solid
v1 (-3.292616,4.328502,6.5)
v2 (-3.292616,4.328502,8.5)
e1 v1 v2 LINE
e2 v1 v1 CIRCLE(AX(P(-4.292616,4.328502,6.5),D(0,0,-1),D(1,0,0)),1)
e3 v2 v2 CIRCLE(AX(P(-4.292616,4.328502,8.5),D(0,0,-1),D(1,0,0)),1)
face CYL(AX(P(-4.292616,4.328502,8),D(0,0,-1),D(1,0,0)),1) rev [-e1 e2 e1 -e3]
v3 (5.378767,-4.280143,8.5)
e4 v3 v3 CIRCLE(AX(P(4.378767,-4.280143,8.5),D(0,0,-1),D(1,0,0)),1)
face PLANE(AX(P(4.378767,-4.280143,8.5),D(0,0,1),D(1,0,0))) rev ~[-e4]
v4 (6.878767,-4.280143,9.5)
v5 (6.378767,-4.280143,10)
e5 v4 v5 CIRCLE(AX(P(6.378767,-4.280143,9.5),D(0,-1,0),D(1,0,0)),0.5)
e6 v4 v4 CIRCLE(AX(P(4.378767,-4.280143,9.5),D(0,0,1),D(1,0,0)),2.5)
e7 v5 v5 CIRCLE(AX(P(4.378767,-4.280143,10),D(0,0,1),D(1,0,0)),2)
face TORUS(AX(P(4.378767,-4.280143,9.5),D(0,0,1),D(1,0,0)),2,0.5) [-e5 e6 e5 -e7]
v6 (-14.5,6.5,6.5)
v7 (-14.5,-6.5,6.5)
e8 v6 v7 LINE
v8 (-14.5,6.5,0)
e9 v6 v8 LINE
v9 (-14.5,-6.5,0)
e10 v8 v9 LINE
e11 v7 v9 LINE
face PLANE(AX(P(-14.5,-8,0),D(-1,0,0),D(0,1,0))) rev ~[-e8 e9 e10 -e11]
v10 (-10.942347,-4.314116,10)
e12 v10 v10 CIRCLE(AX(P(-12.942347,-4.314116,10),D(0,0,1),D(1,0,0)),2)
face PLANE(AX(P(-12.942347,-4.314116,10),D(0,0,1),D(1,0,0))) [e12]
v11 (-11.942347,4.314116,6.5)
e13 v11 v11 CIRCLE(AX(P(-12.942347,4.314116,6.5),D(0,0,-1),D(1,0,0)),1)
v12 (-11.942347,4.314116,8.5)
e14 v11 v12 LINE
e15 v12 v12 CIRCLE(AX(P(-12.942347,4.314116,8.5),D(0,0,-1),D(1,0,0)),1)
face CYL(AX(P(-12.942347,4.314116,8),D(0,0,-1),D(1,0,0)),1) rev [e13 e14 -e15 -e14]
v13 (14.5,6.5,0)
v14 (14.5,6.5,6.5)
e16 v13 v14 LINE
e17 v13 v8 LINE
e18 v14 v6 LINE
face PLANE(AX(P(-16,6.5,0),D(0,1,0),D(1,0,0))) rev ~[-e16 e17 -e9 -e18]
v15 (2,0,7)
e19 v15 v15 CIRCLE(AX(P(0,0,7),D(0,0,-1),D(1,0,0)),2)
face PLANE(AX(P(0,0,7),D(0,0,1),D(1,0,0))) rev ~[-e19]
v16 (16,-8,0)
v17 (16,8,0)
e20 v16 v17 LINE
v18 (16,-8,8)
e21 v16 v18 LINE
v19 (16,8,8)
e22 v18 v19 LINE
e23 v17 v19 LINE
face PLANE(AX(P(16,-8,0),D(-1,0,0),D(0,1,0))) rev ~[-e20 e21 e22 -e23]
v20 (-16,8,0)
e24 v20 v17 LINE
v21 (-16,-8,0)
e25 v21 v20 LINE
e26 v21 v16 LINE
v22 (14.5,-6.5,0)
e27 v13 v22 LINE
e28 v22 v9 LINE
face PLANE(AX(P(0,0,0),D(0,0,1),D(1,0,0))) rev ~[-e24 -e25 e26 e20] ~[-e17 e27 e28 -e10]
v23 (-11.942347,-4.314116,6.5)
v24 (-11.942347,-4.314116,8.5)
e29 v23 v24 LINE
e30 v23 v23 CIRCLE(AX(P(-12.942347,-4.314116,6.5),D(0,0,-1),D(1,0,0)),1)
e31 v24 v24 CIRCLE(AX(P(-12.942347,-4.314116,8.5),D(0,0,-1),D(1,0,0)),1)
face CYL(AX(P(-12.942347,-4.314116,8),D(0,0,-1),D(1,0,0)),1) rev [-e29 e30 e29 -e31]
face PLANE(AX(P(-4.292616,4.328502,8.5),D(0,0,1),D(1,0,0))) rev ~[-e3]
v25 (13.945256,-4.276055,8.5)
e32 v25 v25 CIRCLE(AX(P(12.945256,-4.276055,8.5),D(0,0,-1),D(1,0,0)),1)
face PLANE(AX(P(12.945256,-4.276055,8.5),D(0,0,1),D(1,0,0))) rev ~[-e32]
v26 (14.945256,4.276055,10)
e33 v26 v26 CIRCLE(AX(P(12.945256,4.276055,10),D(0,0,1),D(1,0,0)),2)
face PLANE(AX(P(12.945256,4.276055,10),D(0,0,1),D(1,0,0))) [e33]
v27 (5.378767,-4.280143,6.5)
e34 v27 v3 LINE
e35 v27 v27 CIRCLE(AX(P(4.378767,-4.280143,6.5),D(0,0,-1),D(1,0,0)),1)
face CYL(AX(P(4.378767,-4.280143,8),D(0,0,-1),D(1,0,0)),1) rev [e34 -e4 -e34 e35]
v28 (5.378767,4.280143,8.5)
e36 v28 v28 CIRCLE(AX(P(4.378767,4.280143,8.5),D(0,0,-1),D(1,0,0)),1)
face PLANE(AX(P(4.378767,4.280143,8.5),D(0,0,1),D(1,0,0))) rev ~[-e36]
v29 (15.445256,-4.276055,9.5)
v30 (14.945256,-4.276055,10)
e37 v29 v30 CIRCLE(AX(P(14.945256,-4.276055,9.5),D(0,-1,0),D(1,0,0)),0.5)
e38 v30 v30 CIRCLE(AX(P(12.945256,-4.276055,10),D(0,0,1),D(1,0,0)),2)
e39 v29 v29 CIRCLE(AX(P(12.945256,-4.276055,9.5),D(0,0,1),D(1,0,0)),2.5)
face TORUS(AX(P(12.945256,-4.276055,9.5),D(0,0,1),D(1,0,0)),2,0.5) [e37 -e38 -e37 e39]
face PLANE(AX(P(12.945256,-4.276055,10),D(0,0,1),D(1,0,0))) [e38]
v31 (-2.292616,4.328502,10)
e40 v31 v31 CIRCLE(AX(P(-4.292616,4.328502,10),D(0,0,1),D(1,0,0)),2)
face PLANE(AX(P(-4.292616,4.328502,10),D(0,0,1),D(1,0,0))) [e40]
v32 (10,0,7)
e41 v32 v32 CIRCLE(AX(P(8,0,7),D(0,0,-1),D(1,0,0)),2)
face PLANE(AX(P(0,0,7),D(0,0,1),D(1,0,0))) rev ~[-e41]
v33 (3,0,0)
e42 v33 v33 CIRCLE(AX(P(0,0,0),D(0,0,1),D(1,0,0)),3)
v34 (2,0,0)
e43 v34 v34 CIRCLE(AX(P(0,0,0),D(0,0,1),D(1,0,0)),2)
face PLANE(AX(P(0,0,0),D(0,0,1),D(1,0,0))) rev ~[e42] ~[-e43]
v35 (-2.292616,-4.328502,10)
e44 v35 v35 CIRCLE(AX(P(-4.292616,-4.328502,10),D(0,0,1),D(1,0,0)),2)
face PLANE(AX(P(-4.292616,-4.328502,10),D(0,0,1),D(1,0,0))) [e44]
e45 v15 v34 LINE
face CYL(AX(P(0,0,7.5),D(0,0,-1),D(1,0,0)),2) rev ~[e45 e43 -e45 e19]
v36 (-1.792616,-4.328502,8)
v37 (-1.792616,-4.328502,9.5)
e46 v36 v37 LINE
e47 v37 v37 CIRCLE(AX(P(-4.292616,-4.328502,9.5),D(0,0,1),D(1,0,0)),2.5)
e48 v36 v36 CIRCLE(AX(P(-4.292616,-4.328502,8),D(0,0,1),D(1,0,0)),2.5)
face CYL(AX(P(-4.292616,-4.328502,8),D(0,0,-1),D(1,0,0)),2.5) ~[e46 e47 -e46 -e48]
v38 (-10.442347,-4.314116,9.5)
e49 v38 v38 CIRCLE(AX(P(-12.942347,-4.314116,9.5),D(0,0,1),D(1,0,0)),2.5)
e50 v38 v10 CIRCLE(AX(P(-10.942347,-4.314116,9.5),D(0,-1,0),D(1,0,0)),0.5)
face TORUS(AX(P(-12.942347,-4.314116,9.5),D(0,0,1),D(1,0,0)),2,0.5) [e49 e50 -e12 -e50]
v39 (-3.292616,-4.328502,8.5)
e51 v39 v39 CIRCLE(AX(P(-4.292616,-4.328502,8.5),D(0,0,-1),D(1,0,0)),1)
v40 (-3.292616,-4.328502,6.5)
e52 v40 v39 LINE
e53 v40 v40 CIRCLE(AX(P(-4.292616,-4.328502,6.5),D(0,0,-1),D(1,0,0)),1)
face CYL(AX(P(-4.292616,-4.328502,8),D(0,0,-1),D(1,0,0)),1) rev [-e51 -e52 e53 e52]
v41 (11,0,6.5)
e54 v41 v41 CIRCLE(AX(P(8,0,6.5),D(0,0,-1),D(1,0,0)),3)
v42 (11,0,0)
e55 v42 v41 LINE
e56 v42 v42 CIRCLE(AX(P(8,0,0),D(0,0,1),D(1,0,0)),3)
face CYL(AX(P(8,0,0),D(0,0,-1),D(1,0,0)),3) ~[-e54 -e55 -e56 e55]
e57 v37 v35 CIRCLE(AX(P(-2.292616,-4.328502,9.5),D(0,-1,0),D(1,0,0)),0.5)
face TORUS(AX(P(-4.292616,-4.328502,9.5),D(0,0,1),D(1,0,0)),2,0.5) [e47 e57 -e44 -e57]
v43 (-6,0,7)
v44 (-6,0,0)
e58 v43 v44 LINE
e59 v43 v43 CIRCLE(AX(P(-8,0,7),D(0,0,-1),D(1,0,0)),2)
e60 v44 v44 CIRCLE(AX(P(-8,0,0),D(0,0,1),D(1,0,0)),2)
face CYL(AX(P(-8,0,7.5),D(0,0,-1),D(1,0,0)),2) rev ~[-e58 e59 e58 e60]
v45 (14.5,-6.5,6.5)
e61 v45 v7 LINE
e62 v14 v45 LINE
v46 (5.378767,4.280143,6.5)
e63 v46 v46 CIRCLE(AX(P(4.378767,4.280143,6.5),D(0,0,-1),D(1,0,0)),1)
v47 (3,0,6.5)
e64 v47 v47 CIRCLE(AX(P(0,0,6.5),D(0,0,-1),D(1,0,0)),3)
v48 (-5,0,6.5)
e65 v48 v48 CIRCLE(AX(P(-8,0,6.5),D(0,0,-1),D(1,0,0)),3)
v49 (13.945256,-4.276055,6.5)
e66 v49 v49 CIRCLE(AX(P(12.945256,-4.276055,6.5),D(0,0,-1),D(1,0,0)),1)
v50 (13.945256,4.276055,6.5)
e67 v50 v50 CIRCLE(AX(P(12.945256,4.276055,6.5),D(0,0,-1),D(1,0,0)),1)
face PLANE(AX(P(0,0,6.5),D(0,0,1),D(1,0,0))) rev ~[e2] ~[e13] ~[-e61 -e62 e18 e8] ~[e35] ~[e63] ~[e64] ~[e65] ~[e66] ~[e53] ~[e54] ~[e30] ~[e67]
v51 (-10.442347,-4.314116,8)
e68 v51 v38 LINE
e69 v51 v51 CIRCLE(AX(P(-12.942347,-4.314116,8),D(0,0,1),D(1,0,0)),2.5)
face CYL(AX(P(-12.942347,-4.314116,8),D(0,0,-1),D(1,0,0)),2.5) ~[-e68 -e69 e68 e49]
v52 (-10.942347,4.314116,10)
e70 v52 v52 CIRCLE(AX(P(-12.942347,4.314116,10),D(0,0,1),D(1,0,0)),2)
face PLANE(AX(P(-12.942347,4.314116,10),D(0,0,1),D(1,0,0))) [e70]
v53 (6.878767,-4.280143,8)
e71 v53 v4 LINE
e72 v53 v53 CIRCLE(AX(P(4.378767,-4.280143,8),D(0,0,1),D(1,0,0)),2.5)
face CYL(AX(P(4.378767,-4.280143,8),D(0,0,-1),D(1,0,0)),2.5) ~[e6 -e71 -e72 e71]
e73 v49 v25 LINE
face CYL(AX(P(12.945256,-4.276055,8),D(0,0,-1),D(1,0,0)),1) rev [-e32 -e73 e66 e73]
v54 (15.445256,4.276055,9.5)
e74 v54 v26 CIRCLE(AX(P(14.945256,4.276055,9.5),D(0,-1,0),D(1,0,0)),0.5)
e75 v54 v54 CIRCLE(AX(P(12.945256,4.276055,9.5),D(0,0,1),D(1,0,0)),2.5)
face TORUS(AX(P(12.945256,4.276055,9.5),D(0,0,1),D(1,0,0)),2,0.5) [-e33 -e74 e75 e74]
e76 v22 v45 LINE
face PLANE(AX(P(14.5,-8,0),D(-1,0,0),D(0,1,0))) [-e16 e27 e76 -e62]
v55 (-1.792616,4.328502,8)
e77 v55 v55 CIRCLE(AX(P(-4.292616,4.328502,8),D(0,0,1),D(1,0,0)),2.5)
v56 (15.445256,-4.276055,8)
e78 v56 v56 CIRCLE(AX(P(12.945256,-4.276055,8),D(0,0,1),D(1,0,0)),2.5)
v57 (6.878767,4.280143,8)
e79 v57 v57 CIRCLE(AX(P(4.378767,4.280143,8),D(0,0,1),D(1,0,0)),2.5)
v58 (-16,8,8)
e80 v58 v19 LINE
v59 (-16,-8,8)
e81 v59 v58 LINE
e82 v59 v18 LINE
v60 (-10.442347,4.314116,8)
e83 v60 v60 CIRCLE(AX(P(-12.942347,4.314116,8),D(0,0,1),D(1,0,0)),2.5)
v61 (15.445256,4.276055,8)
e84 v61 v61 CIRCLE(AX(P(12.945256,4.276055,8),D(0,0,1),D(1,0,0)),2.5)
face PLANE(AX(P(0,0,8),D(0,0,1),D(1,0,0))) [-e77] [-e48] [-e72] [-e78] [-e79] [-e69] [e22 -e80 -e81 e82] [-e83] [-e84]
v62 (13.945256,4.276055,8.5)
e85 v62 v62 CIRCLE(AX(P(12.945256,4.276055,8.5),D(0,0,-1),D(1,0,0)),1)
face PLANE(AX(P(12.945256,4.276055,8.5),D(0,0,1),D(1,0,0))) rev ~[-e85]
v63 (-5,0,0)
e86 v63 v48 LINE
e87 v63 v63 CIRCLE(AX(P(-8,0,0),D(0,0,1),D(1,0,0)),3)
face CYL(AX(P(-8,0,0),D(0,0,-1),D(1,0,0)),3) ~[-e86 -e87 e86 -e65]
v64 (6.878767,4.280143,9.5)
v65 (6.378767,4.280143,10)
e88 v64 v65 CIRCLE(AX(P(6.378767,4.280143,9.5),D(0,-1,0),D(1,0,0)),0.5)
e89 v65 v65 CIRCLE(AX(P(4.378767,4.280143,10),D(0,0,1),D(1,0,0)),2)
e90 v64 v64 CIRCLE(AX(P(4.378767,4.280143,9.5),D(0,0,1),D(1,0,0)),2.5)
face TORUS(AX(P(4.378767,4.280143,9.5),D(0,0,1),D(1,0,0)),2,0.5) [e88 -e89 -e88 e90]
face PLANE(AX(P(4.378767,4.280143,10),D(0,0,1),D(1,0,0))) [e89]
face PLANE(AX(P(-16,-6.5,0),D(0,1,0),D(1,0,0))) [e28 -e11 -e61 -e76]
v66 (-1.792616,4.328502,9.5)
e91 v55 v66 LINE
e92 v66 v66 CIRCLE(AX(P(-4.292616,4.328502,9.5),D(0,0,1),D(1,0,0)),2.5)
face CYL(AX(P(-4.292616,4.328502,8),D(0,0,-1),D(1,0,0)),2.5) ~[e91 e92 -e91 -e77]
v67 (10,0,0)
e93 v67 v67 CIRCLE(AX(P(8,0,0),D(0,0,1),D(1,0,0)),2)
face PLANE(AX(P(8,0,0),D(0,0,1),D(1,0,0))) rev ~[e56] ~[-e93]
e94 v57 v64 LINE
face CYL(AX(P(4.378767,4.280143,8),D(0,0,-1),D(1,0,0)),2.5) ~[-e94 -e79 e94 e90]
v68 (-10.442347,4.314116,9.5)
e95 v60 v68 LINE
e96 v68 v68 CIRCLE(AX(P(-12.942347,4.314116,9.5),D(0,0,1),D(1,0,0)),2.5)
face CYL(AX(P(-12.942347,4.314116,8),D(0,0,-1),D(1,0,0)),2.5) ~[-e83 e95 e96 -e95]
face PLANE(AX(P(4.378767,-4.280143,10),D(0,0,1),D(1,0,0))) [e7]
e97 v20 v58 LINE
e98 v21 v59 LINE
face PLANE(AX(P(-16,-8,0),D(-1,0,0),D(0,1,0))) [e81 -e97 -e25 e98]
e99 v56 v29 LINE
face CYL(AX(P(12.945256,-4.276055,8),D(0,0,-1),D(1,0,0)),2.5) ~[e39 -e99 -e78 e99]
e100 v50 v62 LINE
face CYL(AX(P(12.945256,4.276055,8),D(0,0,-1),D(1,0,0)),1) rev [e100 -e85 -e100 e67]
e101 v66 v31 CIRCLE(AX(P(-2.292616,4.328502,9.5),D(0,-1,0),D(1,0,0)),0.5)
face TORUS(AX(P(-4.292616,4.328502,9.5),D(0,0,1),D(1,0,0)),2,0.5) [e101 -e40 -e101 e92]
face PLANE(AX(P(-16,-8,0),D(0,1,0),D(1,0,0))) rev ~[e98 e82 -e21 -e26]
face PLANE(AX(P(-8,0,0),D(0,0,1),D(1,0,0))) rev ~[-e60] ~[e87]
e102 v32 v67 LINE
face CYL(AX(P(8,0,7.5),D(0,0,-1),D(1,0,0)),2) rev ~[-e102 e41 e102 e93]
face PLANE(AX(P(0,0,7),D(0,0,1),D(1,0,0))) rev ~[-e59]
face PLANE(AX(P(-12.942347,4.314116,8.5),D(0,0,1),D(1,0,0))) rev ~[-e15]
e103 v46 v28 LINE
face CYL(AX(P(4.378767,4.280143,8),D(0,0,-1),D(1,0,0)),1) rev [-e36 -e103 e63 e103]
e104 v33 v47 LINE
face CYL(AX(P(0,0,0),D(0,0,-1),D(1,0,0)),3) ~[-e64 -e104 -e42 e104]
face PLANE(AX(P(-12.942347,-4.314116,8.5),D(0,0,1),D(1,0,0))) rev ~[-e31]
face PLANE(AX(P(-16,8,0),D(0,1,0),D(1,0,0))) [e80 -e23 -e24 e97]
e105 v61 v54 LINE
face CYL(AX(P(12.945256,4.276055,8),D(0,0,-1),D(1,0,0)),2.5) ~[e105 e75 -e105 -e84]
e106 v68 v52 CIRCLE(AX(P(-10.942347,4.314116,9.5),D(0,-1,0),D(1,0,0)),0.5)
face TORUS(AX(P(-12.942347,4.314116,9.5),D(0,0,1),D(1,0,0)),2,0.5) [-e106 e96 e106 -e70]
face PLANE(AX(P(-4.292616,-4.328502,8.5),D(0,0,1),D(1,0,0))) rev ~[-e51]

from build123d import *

# Parameters (mm, degrees)
F0_W        = 32
F0_H        = 16
F1_DEPTH    = 8
F3_R        = 2.5
F4_DEPTH    = 2
F6_R        = 0.5
F7_T        = -1.5
F5_R        = 3
F8_DEPTH    = 8
F9_T        = 1
F9_T3_DEPTH = 8.5
F9_T5_DEPTH = 31
F9_T7_DEPTH = 15


# Not quite as in the source:
# - a shell that OpenCascade refuses in one call is made with other operations: the cavity is built on its own and cut out


with BuildPart() as f1:
    # F0 (on Top) → F1 (new body)
    with BuildSketch(Plane.XY):
        Rectangle(F0_W, F0_H)
    extrude(amount=F1_DEPTH)

    # F3 (on offset) → F4 (join)
    with BuildSketch(Plane.XY.offset(8)):
        with Locations((-12.94234666, 4.3141155533)):
            Circle(F3_R)
        with Locations((-4.2926156893, 4.3285023421)):
            Circle(F3_R)
        with Locations((4.3787667528, 4.2801434174)):
            Circle(F3_R)
        with Locations((12.945256196, 4.276055377)):
            Circle(F3_R)
        with Locations((12.945256196, -4.276055377)):
            Circle(F3_R)
        with Locations((4.3787667528, -4.2801434174)):
            Circle(F3_R)
        with Locations((-4.2926156893, -4.3285023421)):
            Circle(F3_R)
        with Locations((-12.94234666, -4.3141155533)):
            Circle(F3_R)
    extrude(amount=F4_DEPTH)

    # F6
    f6_edges = [f1.edges().sort_by_distance(p)[0] for p in [
        (-15.442347, 4.314116, 10),
        (-15.442347, -4.314116, 10),
        (-6.792616, -4.328502, 10),
        (-6.792616, 4.328502, 10),
        (1.878767, 4.280143, 10),
        (1.878767, -4.280143, 10),
        (10.445256, 4.276055, 10),
        (10.445256, -4.276055, 10),
    ]]
    fillet(f6_edges, radius=F6_R)

    # F7
    f7_openings = [f1.faces().sort_by_distance(p)[0] for p in [
        (0, 0, 0),
    ]]
    offset(amount=F7_T, openings=f7_openings, kind=Kind.INTERSECTION)

    # F5 (on Top) → F8 (join)
    with BuildSketch(Plane.XY):
        with Locations((-8, 0)):
            Circle(F5_R)
        Circle(F5_R)
        with Locations((8, 0)):
            Circle(F5_R)
    extrude(amount=F8_DEPTH)

    # F9: shell of thickness 1, made by hand


with BuildPart() as f9_core1:
    # F9_t2: copy of F1
    add(f1.part)

    # the walls: a layer under each face that stays
    f9_faces = [f9_core1.faces().sort_by_distance(p)[0] for p in [
        (-15.44234666, -4.3141155533, 8.75),
        (0, 0, 8),
        (-12.94234666, -4.3141155533, 10),
        (0, -8, 4),
        (-16, 0, 4),
        (16, 0, 4),
        (0, 8, 4),
        (-6.7926156893, -4.3285023421, 8.75),
        (1.8787667528, -4.2801434174, 8.75),
        (10.445256196, -4.276055377, 8.75),
        (-15.44234666, 4.3141155533, 8.75),
        (-6.7926156893, 4.3285023421, 8.75),
        (1.8787667528, 4.2801434174, 8.75),
        (10.445256196, 4.276055377, 8.75),
        (-13.7142857143, -6.8571428571, 0),
        (0, -6.5, 3.25),
        (-14.5, 0, 3.25),
        (0, 6.5, 3.25),
        (14.5, 0, 3.25),
        (-4.2926156893, -4.3285023421, 10),
        (4.3787667528, -4.2801434174, 10),
        (12.945256196, -4.276055377, 10),
        (-12.94234666, 4.3141155533, 10),
        (-4.2926156893, 4.3285023421, 10),
        (4.3787667528, 4.2801434174, 10),
        (12.945256196, 4.276055377, 10),
        (-9.6666666667, -4.3333333333, 6.5),
        (-13.94234666, -4.3141155533, 7.5),
        (-5.2926156893, -4.3285023421, 7.5),
        (3.3787667528, -4.2801434174, 7.5),
        (11.945256196, -4.276055377, 7.5),
        (-11, 0, 3.25),
        (-3, 0, 3.25),
        (-13.94234666, 4.3141155533, 7.5),
        (-5.2926156893, 4.3285023421, 7.5),
        (5, 0, 3.25),
        (3.3787667528, 4.2801434174, 7.5),
        (11.945256196, 4.276055377, 7.5),
        (-12.94234666, -4.3141155533, 8.5),
        (-4.2926156893, -4.3285023421, 8.5),
        (4.3787667528, -4.2801434174, 8.5),
        (12.945256196, -4.276055377, 8.5),
        (-12.94234666, 4.3141155533, 8.5),
        (-4.2926156893, 4.3285023421, 8.5),
        (4.3787667528, 4.2801434174, 8.5),
        (12.945256196, 4.276055377, 8.5),
    ]]
    thicken(f9_faces, amount=-F9_T, mode=Mode.SUBTRACT)

    # F9_s4 → F9_t3 (cut)
    with BuildSketch(Plane.XY.offset(-1)):
        Polygon((-14.49, -6.49), (-14.5, -7.5), (-15.5, -7.5), (-15.5, -6.5), align=None)
        Polygon((14.49, -6.49), (14.5, -7.5), (15.5, -7.5), (15.5, -6.5), align=None)
        Polygon((-14.49, 6.49), (-15.5, 6.5), (-15.5, 7.5), (-14.5, 7.5), align=None)
        Polygon((14.49, 6.49), (14.5, 7.5), (15.5, 7.5), (15.5, 6.5), align=None)
    extrude(amount=F9_T3_DEPTH, mode=Mode.SUBTRACT)

    # F9_s6 → F9_t5 (cut)
    with BuildSketch(Plane.YZ.offset(-15.5)):
        Polygon((-6.49, 6.49), (-7.5, 6.5), (-7.5, 7.5), (-6.5, 7.5), align=None)
        Polygon((6.49, 6.49), (7.5, 6.5), (7.5, 7.5), (6.5, 7.5), align=None)
    extrude(amount=F9_T5_DEPTH, mode=Mode.SUBTRACT)

    # F9_s8 → F9_t7 (cut)
    with BuildSketch(Plane.XZ.offset(-7.5)):
        Polygon((-14.49, 6.49), (-15.5, 6.5), (-15.5, 7.5), (-14.5, 7.5), align=None)
        Polygon((14.49, 6.49), (15.5, 6.5), (15.5, 7.5), (14.5, 7.5), align=None)
    extrude(amount=F9_T7_DEPTH, mode=Mode.SUBTRACT)

    # F9_s9 → F9_t10 (revolve, cut)
    with BuildSketch(Plane.XZ.offset(4.3141155533)):
        Polygon((-10.43234666, 8.01), (-11.44234666, 8), (-11.44234666, 7), (-10.44234666, 7), align=None)
    revolve(axis=Axis((-12.94234666, -4.3141155533, 8), (0, 0, 1)), mode=Mode.SUBTRACT)

    # F9_s11 → F9_t12 (revolve, cut)
    with BuildSketch(Plane.XZ.offset(4.3285023421)):
        Polygon((-1.7826156893, 8.01), (-1.7926156893, 7), (-2.7926156893, 7), (-2.7926156893, 8), align=None)
    revolve(axis=Axis((-4.2926156893, -4.3285023421, 8), (0, 0, 1)), mode=Mode.SUBTRACT)

    # F9_s13 → F9_t14 (revolve, cut)
    with BuildSketch(Plane.XZ.offset(4.2801434174)):
        Polygon((6.8887667528, 8.01), (6.8787667528, 7), (5.8787667528, 7), (5.8787667528, 8), align=None)
    revolve(axis=Axis((4.3787667528, -4.2801434174, 8), (0, 0, 1)), mode=Mode.SUBTRACT)

    # F9_s15 → F9_t16 (revolve, cut)
    with BuildSketch(Plane.XZ.offset(4.276055377)):
        Polygon((15.455256196, 8.01), (15.445256196, 7), (14.445256196, 7), (14.445256196, 8), align=None)
    revolve(axis=Axis((12.945256196, -4.276055377, 8), (0, 0, 1)), mode=Mode.SUBTRACT)

    # F9_s17 → F9_t18 (revolve, cut)
    with BuildSketch(Plane.XZ.offset(-4.3141155533)):
        Polygon((-10.43234666, 8.01), (-10.44234666, 7), (-11.44234666, 7), (-11.44234666, 8), align=None)
    revolve(axis=Axis((-12.94234666, 4.3141155533, 8), (0, 0, 1)), mode=Mode.SUBTRACT)

    # F9_s19 → F9_t20 (revolve, cut)
    with BuildSketch(Plane.XZ.offset(-4.3285023421)):
        Polygon((-1.7826156893, 8.01), (-1.7926156893, 7), (-2.7926156893, 7), (-2.7926156893, 8), align=None)
    revolve(axis=Axis((-4.2926156893, 4.3285023421, 8), (0, 0, 1)), mode=Mode.SUBTRACT)

    # F9_s21 → F9_t22 (revolve, cut)
    with BuildSketch(Plane.XZ.offset(-4.2801434174)):
        Polygon((6.8887667528, 8.01), (6.8787667528, 7), (5.8787667528, 7), (5.8787667528, 8), align=None)
    revolve(axis=Axis((4.3787667528, 4.2801434174, 8), (0, 0, 1)), mode=Mode.SUBTRACT)

    # F9_s23 → F9_t24 (revolve, cut)
    with BuildSketch(Plane.XZ.offset(-4.276055377)):
        Polygon((15.455256196, 8.01), (15.445256196, 7), (14.445256196, 7), (14.445256196, 8), align=None)
    revolve(axis=Axis((12.945256196, 4.276055377, 8), (0, 0, 1)), mode=Mode.SUBTRACT)

    # F9_s25 → F9_t26 (revolve, cut)
    with BuildSketch(Plane.XZ):
        Polygon((-4.99, 6.49), (-5, 7.5), (-6, 7.5), (-6, 6.5), align=None)
    revolve(axis=Axis((-8, 0, 6.5), (0, 0, -1)), mode=Mode.SUBTRACT)

    # F9_s27 → F9_t28 (revolve, cut)
    with BuildSketch(Plane.XZ):
        Polygon((3.01, 6.49), (3, 7.5), (2, 7.5), (2, 6.5), align=None)
    revolve(axis=Axis((0, 0, 6.5), (0, 0, -1)), mode=Mode.SUBTRACT)

    # F9_s29 → F9_t30 (revolve, cut)
    with BuildSketch(Plane.XZ):
        Polygon((11.01, 6.49), (11, 7.5), (10, 7.5), (10, 6.5), align=None)
    revolve(axis=Axis((8, 0, 6.5), (0, 0, -1)), mode=Mode.SUBTRACT)

    # F9_s31 → F9_t32 (revolve, cut)
    with BuildSketch(Plane.XZ.offset(4.3141155533)):
        Polygon((-11.95234666, 8.49), (-10.94234666, 8.5), (-10.94234666, 9.5), (-11.94234666, 9.5), align=None)
    revolve(axis=Axis((-12.94234666, -4.3141155533, 8.5), (0, 0, -1)), mode=Mode.SUBTRACT)

    # F9_s33 → F9_t34 (revolve, cut)
    with BuildSketch(Plane.XZ.offset(4.3285023421)):
        Polygon((-3.3026156893, 8.49), (-2.2926156893, 8.5), (-2.2926156893, 9.5), (-3.2926156893, 9.5), align=None)
    revolve(axis=Axis((-4.2926156893, -4.3285023421, 8.5), (0, 0, -1)), mode=Mode.SUBTRACT)

    # F9_s35 → F9_t36 (revolve, cut)
    with BuildSketch(Plane.XZ.offset(4.2801434174)):
        Polygon((5.3687667528, 8.49), (6.3787667528, 8.5), (6.3787667528, 9.5), (5.3787667528, 9.5), align=None)
    revolve(axis=Axis((4.3787667528, -4.2801434174, 8.5), (0, 0, -1)), mode=Mode.SUBTRACT)

    # F9_s37 → F9_t38 (revolve, cut)
    with BuildSketch(Plane.XZ.offset(4.276055377)):
        Polygon((13.935256196, 8.49), (14.945256196, 8.5), (14.945256196, 9.5), (13.945256196, 9.5), align=None)
    revolve(axis=Axis((12.945256196, -4.276055377, 8.5), (0, 0, -1)), mode=Mode.SUBTRACT)

    # F9_s39 → F9_t40 (revolve, cut)
    with BuildSketch(Plane.XZ.offset(-4.3141155533)):
        Polygon((-11.95234666, 8.49), (-10.94234666, 8.5), (-10.94234666, 9.5), (-11.94234666, 9.5), align=None)
    revolve(axis=Axis((-12.94234666, 4.3141155533, 8.5), (0, 0, -1)), mode=Mode.SUBTRACT)

    # F9_s41 → F9_t42 (revolve, cut)
    with BuildSketch(Plane.XZ.offset(-4.3285023421)):
        Polygon((-3.3026156893, 8.49), (-2.2926156893, 8.5), (-2.2926156893, 9.5), (-3.2926156893, 9.5), align=None)
    revolve(axis=Axis((-4.2926156893, 4.3285023421, 8.5), (0, 0, -1)), mode=Mode.SUBTRACT)

    # F9_s43 → F9_t44 (revolve, cut)
    with BuildSketch(Plane.XZ.offset(-4.2801434174)):
        Polygon((5.3687667528, 8.49), (6.3787667528, 8.5), (6.3787667528, 9.5), (5.3787667528, 9.5), align=None)
    revolve(axis=Axis((4.3787667528, 4.2801434174, 8.5), (0, 0, -1)), mode=Mode.SUBTRACT)

    # F9_s45 → F9_t46 (revolve, cut)
    with BuildSketch(Plane.XZ.offset(-4.276055377)):
        Polygon((13.935256196, 8.49), (14.945256196, 8.5), (14.945256196, 9.5), (13.945256196, 9.5), align=None)
    revolve(axis=Axis((12.945256196, 4.276055377, 8.5), (0, 0, -1)), mode=Mode.SUBTRACT)


with BuildPart() as f1_1:
    add(f1.part)

    # what is left inside the walls is the cavity
    f9_cavity = [f9_core1.part.solids().sort_by_distance(p)[0] for p in [
        (-9.99, 0, 4.666667),
        (-1.99, 0, 4.666667),
        (6.01, 0, 4.666667),
    ]]
    add(f9_cavity, mode=Mode.SUBTRACT)


solid = f1_1.part
